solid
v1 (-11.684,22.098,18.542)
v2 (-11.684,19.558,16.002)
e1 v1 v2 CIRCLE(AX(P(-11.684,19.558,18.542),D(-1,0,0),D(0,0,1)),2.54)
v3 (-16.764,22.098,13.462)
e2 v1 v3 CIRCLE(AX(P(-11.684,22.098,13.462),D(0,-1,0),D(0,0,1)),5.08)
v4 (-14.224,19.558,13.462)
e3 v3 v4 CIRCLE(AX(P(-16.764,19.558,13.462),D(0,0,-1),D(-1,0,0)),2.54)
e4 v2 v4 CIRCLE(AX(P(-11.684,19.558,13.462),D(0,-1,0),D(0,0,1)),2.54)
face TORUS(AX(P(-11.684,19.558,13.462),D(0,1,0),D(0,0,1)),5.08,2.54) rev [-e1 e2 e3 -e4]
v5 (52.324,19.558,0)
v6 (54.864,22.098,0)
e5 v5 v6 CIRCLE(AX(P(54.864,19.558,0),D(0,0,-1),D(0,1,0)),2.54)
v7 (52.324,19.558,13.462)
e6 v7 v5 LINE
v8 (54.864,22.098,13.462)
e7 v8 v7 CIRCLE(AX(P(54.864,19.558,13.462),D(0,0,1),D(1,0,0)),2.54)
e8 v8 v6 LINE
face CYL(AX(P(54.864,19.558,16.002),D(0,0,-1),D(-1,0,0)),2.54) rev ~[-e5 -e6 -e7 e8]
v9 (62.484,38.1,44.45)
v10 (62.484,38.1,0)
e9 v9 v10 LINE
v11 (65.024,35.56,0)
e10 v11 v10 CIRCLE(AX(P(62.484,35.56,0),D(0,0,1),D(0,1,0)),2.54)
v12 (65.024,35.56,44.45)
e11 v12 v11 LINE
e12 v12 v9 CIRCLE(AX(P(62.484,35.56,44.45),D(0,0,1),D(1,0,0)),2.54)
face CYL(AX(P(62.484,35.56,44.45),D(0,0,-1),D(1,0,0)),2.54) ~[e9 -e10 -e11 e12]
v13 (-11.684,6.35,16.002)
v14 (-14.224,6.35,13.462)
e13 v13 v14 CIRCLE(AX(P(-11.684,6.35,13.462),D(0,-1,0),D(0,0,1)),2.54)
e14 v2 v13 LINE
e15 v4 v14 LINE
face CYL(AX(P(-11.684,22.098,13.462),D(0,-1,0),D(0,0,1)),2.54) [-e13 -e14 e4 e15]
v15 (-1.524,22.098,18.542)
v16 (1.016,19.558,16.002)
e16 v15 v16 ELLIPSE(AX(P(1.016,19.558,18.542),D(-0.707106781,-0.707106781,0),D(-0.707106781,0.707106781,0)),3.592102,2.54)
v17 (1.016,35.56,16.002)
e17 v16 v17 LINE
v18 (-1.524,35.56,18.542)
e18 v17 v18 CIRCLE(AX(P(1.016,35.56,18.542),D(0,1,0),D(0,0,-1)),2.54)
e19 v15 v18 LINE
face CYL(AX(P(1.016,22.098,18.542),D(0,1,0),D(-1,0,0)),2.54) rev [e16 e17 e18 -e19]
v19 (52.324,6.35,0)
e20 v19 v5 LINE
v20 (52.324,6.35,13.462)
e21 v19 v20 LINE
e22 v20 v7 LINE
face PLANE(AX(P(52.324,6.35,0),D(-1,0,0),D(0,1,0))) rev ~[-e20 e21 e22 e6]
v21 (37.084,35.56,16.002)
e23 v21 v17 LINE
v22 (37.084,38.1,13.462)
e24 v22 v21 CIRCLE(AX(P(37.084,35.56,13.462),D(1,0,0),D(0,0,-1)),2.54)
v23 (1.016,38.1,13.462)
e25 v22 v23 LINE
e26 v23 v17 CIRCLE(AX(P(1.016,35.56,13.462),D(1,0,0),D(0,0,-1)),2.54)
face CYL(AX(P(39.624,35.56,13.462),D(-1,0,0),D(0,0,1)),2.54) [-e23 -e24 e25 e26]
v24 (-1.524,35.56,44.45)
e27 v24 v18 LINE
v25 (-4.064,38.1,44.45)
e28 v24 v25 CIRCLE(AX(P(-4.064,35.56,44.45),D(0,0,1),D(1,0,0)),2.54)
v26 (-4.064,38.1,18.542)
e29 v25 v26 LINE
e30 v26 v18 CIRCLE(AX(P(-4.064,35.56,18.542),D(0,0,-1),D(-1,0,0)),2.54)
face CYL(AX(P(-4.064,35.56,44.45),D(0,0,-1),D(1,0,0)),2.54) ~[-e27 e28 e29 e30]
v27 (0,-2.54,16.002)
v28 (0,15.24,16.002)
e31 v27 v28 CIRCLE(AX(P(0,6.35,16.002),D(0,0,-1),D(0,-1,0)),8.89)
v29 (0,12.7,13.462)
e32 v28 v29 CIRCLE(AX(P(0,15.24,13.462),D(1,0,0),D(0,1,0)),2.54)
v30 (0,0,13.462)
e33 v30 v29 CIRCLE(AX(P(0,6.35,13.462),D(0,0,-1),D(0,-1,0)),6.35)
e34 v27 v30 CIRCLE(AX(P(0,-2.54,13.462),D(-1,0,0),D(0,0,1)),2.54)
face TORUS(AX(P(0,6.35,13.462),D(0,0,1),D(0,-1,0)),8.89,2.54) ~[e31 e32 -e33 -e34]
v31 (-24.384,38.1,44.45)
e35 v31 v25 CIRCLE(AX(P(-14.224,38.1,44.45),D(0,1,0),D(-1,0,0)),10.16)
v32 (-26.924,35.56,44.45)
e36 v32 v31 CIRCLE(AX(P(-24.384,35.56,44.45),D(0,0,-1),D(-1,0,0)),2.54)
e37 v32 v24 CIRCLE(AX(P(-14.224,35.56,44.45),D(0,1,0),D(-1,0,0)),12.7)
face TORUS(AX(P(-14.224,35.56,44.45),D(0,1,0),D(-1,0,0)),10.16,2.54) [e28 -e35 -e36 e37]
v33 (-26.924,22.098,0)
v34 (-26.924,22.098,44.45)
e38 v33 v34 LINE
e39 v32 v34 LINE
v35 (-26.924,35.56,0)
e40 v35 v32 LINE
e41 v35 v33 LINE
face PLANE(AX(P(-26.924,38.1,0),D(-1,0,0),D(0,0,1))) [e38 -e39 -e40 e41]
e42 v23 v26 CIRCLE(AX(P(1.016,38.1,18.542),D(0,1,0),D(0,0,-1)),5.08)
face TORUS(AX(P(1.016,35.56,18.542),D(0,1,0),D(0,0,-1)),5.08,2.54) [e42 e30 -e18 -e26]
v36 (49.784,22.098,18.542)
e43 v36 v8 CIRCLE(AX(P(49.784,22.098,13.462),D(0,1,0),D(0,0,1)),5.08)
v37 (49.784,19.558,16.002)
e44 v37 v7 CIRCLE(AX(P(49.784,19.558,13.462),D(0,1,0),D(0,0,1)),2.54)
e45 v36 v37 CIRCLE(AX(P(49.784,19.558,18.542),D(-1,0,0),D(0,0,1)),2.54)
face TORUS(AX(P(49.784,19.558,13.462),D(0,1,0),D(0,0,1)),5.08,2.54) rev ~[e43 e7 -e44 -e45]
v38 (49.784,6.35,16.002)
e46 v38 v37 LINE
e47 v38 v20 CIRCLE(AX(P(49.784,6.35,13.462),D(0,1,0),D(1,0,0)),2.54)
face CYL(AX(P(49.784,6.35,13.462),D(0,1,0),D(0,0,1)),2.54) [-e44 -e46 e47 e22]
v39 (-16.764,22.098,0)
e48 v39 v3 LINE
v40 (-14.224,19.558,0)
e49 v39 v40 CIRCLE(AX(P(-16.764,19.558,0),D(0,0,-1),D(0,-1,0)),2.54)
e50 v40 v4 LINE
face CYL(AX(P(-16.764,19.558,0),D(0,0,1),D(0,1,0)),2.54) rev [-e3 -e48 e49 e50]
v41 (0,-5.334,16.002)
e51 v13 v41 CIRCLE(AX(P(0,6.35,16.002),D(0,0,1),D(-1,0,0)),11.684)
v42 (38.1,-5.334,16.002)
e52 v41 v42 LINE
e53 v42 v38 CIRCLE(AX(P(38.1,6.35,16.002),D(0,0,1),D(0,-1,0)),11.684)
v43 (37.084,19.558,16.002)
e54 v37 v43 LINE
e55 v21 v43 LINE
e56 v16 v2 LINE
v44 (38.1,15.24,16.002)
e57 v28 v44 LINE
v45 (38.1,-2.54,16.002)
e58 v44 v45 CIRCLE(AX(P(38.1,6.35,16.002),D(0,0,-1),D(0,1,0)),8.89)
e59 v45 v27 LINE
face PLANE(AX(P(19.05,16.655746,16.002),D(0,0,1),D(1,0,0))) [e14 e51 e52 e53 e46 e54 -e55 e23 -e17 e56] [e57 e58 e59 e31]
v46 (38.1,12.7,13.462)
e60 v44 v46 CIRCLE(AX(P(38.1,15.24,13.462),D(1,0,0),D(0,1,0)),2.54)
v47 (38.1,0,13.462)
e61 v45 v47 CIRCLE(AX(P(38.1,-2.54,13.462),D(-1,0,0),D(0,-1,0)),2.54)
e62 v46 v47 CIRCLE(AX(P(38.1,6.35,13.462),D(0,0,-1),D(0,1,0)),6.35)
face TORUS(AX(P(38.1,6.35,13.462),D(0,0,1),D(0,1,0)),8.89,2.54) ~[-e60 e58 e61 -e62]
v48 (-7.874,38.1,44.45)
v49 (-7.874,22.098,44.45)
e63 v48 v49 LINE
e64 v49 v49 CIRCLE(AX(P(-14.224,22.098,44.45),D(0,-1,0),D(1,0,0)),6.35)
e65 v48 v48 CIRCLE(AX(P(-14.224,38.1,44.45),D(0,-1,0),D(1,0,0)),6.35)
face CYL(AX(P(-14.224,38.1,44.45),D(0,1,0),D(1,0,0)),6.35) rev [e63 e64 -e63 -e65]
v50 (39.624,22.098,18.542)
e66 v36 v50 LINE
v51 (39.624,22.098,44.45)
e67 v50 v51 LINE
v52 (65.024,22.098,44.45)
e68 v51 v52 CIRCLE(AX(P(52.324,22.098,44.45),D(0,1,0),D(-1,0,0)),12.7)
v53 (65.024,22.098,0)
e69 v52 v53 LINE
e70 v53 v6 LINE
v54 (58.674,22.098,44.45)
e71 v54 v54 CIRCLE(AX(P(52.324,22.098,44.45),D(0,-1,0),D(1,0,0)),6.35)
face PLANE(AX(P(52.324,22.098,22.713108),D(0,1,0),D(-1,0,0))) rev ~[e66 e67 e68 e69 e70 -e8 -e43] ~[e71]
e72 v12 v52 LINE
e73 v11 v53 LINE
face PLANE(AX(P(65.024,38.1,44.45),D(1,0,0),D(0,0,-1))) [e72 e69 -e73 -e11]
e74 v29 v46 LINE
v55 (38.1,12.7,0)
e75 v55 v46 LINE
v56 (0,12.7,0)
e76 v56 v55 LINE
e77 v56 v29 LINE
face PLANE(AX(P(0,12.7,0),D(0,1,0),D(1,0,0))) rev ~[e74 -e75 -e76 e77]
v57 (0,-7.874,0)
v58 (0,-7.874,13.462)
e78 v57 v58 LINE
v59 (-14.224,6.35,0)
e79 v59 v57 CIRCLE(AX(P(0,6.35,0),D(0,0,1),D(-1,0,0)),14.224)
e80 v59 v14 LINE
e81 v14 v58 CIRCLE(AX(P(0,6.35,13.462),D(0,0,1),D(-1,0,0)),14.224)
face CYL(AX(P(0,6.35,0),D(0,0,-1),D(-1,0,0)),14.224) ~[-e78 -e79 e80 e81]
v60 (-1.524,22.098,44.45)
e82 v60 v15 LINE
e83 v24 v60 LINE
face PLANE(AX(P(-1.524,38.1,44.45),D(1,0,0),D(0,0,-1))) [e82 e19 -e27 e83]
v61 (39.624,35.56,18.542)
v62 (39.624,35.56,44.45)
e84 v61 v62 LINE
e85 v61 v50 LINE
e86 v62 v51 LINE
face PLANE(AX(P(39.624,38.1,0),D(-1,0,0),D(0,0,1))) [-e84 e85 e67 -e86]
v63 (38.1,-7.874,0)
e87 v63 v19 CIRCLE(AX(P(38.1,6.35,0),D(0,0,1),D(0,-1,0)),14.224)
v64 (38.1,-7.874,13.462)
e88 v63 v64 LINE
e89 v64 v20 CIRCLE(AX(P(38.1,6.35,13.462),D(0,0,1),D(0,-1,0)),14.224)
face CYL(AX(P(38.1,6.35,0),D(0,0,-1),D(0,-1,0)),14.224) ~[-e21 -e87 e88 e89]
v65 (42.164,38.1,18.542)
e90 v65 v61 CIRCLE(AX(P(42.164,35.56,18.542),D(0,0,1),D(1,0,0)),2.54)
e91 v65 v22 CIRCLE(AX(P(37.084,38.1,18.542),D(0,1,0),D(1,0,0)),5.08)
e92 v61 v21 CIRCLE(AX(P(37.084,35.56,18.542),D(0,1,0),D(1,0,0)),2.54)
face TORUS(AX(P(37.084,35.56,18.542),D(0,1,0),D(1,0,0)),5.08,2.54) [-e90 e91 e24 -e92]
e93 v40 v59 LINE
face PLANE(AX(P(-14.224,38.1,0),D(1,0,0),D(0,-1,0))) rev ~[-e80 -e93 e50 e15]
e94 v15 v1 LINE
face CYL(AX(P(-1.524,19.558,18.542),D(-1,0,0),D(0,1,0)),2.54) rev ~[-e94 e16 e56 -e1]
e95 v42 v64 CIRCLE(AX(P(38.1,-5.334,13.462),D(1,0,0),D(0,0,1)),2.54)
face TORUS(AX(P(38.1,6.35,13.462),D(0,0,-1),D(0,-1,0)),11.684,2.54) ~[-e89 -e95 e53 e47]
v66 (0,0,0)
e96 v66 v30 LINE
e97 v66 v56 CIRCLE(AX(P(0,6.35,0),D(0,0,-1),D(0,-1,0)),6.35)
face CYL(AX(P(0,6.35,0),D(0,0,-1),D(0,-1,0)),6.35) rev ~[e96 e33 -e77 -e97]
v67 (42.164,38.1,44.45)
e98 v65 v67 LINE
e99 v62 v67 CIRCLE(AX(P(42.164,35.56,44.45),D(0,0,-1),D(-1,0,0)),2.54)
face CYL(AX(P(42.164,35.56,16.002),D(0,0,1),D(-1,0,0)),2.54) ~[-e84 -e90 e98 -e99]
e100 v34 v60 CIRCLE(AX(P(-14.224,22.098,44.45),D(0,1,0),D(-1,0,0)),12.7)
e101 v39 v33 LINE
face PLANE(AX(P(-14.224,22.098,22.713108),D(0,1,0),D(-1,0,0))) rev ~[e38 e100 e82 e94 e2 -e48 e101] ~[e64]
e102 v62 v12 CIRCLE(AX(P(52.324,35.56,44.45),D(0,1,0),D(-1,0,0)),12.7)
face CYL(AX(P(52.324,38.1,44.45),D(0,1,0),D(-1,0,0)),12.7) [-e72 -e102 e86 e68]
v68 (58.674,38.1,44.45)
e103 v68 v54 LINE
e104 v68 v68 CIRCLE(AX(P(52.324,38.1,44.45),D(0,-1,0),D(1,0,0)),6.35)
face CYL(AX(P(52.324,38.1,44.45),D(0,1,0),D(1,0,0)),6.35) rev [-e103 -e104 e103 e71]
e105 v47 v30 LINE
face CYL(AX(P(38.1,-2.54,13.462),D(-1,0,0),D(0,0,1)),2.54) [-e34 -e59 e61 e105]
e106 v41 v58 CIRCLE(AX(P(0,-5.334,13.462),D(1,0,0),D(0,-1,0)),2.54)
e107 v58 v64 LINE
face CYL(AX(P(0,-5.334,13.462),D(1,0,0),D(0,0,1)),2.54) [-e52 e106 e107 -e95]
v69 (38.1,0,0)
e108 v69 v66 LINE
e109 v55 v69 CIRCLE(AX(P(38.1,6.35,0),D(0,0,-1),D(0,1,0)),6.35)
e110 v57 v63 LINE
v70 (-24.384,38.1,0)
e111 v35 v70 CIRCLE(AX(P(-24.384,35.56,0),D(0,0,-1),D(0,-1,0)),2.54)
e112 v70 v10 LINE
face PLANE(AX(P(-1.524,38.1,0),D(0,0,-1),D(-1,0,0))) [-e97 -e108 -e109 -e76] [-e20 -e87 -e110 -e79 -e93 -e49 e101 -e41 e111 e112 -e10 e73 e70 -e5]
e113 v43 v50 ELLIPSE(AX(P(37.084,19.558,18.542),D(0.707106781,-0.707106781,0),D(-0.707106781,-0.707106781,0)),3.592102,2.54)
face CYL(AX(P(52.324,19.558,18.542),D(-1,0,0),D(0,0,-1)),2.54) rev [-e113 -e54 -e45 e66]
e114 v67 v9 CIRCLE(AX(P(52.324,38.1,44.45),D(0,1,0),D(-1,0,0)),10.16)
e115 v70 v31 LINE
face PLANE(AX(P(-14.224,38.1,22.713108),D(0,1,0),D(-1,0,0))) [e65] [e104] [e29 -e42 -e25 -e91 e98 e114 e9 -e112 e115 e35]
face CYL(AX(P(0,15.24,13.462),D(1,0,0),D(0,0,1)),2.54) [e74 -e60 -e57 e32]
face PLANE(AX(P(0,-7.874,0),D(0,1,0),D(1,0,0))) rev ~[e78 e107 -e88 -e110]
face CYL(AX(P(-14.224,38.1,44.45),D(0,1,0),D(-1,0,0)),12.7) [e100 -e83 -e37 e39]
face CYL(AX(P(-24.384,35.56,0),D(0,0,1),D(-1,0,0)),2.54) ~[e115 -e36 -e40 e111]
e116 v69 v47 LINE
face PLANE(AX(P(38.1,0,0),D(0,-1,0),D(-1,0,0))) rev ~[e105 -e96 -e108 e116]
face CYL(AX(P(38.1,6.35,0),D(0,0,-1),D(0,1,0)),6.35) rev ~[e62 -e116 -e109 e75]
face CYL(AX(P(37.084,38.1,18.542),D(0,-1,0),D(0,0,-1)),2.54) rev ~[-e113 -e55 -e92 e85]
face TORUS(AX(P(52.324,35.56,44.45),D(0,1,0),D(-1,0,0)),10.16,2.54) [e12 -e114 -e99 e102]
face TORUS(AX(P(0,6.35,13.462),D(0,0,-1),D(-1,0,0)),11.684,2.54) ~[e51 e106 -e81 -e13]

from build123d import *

# Parameters (mm, degrees)
F1_DEPTH = 16.002
F3_DEPTH = 16.002
F4_R     = 2.54


with BuildPart() as f1:
    # F0 (on Top) → F1 (new body)
    with BuildSketch(Plane.XY):
        with BuildLine():
            ThreePointArc((38.1, -7.874), (48.1578868556, -3.7078868556), (52.324, 6.35))
            Line((52.324, 6.35), (52.324, 38.1))
            Line((52.324, 38.1), (-14.224, 38.1))
            Line((-14.224, 38.1), (-14.224, 6.35))
            ThreePointArc((-14.224, 6.35), (-10.0578868556, -3.7078868556), (0, -7.874))
            Line((0, -7.874), (38.1, -7.874))
        make_face()
        with BuildLine():
            Line((38.1, 0), (0, 0))
            ThreePointArc((0, 0), (-6.35, 6.35), (0, 12.7))
            Line((0, 12.7), (38.1, 12.7))
            ThreePointArc((38.1, 12.7), (44.45, 6.35), (38.1, 0))
        make_face(mode=Mode.SUBTRACT)
    extrude(amount=F1_DEPTH)

    # F2 (on face) → F3 (join)
    with BuildSketch(Plane(origin=(0, 38.1, 0), x_dir=(-1, 0, 0), z_dir=(0, 1, 0))):
        with BuildLine():
            Line((26.924, 0), (26.924, 44.45))
            Line((26.924, 44.45), (20.574, 44.45))
            ThreePointArc((20.574, 44.45), (14.224, 38.1), (7.874, 44.45))
            Line((7.874, 44.45), (1.524, 44.45))
            Line((1.524, 44.45), (1.524, 0))
            Line((1.524, 0), (26.924, 0))
        make_face()
        with BuildLine():
            Line((20.574, 44.45), (26.924, 44.45))
            ThreePointArc((26.924, 44.45), (14.224, 57.15), (1.524, 44.45))
            Line((1.524, 44.45), (7.874, 44.45))
            ThreePointArc((7.874, 44.45), (14.224, 50.8), (20.574, 44.45))
        make_face()
        with BuildLine():
            Line((-39.624, 0), (-39.624, 44.45))
            Line((-39.624, 44.45), (-45.974, 44.45))
            ThreePointArc((-45.974, 44.45), (-52.324, 38.1), (-58.674, 44.45))
            Line((-58.674, 44.45), (-65.024, 44.45))
            Line((-65.024, 44.45), (-65.024, 0))
            Line((-65.024, 0), (-39.624, 0))
        make_face()
        with BuildLine():
            Line((-45.974, 44.45), (-39.624, 44.45))
            ThreePointArc((-39.624, 44.45), (-52.324, 57.15), (-65.024, 44.45))
            Line((-65.024, 44.45), (-58.674, 44.45))
            ThreePointArc((-58.674, 44.45), (-52.324, 50.8), (-45.974, 44.45))
        make_face()
    extrude(amount=-F3_DEPTH)

    # F4
    f4_edges = [f1.edges().sort_by_distance(p)[0] for p in [
        (52.324, 14.224, 16.002),
        (-10.057887, -3.707887, 16.002),
        (-14.224, 14.224, 16.002),
        (-7.874, 22.098, 16.002),
        (-1.524, 30.099, 16.002),
        (19.05, 38.1, 16.002),
        (39.624, 30.099, 16.002),
        (45.974, 22.098, 16.002),
        (48.157887, -3.707887, 16.002),
        (19.05, -7.874, 16.002),
        (44.45, 6.35, 16.002),
        (19.05, 12.7, 16.002),
        (19.05, 0, 16.002),
        (-6.35, 6.35, 16.002),
        (52.324, 22.098, 8.001),
        (52.324, 38.1, 57.15),
        (65.024, 38.1, 22.225),
        (39.624, 38.1, 30.226),
        (-1.524, 38.1, 30.226),
        (-14.224, 38.1, 57.15),
        (-26.924, 38.1, 22.225),
        (-14.224, 22.098, 8.001),
    ]]
    fillet(f4_edges, radius=F4_R)


solid = f1.part
